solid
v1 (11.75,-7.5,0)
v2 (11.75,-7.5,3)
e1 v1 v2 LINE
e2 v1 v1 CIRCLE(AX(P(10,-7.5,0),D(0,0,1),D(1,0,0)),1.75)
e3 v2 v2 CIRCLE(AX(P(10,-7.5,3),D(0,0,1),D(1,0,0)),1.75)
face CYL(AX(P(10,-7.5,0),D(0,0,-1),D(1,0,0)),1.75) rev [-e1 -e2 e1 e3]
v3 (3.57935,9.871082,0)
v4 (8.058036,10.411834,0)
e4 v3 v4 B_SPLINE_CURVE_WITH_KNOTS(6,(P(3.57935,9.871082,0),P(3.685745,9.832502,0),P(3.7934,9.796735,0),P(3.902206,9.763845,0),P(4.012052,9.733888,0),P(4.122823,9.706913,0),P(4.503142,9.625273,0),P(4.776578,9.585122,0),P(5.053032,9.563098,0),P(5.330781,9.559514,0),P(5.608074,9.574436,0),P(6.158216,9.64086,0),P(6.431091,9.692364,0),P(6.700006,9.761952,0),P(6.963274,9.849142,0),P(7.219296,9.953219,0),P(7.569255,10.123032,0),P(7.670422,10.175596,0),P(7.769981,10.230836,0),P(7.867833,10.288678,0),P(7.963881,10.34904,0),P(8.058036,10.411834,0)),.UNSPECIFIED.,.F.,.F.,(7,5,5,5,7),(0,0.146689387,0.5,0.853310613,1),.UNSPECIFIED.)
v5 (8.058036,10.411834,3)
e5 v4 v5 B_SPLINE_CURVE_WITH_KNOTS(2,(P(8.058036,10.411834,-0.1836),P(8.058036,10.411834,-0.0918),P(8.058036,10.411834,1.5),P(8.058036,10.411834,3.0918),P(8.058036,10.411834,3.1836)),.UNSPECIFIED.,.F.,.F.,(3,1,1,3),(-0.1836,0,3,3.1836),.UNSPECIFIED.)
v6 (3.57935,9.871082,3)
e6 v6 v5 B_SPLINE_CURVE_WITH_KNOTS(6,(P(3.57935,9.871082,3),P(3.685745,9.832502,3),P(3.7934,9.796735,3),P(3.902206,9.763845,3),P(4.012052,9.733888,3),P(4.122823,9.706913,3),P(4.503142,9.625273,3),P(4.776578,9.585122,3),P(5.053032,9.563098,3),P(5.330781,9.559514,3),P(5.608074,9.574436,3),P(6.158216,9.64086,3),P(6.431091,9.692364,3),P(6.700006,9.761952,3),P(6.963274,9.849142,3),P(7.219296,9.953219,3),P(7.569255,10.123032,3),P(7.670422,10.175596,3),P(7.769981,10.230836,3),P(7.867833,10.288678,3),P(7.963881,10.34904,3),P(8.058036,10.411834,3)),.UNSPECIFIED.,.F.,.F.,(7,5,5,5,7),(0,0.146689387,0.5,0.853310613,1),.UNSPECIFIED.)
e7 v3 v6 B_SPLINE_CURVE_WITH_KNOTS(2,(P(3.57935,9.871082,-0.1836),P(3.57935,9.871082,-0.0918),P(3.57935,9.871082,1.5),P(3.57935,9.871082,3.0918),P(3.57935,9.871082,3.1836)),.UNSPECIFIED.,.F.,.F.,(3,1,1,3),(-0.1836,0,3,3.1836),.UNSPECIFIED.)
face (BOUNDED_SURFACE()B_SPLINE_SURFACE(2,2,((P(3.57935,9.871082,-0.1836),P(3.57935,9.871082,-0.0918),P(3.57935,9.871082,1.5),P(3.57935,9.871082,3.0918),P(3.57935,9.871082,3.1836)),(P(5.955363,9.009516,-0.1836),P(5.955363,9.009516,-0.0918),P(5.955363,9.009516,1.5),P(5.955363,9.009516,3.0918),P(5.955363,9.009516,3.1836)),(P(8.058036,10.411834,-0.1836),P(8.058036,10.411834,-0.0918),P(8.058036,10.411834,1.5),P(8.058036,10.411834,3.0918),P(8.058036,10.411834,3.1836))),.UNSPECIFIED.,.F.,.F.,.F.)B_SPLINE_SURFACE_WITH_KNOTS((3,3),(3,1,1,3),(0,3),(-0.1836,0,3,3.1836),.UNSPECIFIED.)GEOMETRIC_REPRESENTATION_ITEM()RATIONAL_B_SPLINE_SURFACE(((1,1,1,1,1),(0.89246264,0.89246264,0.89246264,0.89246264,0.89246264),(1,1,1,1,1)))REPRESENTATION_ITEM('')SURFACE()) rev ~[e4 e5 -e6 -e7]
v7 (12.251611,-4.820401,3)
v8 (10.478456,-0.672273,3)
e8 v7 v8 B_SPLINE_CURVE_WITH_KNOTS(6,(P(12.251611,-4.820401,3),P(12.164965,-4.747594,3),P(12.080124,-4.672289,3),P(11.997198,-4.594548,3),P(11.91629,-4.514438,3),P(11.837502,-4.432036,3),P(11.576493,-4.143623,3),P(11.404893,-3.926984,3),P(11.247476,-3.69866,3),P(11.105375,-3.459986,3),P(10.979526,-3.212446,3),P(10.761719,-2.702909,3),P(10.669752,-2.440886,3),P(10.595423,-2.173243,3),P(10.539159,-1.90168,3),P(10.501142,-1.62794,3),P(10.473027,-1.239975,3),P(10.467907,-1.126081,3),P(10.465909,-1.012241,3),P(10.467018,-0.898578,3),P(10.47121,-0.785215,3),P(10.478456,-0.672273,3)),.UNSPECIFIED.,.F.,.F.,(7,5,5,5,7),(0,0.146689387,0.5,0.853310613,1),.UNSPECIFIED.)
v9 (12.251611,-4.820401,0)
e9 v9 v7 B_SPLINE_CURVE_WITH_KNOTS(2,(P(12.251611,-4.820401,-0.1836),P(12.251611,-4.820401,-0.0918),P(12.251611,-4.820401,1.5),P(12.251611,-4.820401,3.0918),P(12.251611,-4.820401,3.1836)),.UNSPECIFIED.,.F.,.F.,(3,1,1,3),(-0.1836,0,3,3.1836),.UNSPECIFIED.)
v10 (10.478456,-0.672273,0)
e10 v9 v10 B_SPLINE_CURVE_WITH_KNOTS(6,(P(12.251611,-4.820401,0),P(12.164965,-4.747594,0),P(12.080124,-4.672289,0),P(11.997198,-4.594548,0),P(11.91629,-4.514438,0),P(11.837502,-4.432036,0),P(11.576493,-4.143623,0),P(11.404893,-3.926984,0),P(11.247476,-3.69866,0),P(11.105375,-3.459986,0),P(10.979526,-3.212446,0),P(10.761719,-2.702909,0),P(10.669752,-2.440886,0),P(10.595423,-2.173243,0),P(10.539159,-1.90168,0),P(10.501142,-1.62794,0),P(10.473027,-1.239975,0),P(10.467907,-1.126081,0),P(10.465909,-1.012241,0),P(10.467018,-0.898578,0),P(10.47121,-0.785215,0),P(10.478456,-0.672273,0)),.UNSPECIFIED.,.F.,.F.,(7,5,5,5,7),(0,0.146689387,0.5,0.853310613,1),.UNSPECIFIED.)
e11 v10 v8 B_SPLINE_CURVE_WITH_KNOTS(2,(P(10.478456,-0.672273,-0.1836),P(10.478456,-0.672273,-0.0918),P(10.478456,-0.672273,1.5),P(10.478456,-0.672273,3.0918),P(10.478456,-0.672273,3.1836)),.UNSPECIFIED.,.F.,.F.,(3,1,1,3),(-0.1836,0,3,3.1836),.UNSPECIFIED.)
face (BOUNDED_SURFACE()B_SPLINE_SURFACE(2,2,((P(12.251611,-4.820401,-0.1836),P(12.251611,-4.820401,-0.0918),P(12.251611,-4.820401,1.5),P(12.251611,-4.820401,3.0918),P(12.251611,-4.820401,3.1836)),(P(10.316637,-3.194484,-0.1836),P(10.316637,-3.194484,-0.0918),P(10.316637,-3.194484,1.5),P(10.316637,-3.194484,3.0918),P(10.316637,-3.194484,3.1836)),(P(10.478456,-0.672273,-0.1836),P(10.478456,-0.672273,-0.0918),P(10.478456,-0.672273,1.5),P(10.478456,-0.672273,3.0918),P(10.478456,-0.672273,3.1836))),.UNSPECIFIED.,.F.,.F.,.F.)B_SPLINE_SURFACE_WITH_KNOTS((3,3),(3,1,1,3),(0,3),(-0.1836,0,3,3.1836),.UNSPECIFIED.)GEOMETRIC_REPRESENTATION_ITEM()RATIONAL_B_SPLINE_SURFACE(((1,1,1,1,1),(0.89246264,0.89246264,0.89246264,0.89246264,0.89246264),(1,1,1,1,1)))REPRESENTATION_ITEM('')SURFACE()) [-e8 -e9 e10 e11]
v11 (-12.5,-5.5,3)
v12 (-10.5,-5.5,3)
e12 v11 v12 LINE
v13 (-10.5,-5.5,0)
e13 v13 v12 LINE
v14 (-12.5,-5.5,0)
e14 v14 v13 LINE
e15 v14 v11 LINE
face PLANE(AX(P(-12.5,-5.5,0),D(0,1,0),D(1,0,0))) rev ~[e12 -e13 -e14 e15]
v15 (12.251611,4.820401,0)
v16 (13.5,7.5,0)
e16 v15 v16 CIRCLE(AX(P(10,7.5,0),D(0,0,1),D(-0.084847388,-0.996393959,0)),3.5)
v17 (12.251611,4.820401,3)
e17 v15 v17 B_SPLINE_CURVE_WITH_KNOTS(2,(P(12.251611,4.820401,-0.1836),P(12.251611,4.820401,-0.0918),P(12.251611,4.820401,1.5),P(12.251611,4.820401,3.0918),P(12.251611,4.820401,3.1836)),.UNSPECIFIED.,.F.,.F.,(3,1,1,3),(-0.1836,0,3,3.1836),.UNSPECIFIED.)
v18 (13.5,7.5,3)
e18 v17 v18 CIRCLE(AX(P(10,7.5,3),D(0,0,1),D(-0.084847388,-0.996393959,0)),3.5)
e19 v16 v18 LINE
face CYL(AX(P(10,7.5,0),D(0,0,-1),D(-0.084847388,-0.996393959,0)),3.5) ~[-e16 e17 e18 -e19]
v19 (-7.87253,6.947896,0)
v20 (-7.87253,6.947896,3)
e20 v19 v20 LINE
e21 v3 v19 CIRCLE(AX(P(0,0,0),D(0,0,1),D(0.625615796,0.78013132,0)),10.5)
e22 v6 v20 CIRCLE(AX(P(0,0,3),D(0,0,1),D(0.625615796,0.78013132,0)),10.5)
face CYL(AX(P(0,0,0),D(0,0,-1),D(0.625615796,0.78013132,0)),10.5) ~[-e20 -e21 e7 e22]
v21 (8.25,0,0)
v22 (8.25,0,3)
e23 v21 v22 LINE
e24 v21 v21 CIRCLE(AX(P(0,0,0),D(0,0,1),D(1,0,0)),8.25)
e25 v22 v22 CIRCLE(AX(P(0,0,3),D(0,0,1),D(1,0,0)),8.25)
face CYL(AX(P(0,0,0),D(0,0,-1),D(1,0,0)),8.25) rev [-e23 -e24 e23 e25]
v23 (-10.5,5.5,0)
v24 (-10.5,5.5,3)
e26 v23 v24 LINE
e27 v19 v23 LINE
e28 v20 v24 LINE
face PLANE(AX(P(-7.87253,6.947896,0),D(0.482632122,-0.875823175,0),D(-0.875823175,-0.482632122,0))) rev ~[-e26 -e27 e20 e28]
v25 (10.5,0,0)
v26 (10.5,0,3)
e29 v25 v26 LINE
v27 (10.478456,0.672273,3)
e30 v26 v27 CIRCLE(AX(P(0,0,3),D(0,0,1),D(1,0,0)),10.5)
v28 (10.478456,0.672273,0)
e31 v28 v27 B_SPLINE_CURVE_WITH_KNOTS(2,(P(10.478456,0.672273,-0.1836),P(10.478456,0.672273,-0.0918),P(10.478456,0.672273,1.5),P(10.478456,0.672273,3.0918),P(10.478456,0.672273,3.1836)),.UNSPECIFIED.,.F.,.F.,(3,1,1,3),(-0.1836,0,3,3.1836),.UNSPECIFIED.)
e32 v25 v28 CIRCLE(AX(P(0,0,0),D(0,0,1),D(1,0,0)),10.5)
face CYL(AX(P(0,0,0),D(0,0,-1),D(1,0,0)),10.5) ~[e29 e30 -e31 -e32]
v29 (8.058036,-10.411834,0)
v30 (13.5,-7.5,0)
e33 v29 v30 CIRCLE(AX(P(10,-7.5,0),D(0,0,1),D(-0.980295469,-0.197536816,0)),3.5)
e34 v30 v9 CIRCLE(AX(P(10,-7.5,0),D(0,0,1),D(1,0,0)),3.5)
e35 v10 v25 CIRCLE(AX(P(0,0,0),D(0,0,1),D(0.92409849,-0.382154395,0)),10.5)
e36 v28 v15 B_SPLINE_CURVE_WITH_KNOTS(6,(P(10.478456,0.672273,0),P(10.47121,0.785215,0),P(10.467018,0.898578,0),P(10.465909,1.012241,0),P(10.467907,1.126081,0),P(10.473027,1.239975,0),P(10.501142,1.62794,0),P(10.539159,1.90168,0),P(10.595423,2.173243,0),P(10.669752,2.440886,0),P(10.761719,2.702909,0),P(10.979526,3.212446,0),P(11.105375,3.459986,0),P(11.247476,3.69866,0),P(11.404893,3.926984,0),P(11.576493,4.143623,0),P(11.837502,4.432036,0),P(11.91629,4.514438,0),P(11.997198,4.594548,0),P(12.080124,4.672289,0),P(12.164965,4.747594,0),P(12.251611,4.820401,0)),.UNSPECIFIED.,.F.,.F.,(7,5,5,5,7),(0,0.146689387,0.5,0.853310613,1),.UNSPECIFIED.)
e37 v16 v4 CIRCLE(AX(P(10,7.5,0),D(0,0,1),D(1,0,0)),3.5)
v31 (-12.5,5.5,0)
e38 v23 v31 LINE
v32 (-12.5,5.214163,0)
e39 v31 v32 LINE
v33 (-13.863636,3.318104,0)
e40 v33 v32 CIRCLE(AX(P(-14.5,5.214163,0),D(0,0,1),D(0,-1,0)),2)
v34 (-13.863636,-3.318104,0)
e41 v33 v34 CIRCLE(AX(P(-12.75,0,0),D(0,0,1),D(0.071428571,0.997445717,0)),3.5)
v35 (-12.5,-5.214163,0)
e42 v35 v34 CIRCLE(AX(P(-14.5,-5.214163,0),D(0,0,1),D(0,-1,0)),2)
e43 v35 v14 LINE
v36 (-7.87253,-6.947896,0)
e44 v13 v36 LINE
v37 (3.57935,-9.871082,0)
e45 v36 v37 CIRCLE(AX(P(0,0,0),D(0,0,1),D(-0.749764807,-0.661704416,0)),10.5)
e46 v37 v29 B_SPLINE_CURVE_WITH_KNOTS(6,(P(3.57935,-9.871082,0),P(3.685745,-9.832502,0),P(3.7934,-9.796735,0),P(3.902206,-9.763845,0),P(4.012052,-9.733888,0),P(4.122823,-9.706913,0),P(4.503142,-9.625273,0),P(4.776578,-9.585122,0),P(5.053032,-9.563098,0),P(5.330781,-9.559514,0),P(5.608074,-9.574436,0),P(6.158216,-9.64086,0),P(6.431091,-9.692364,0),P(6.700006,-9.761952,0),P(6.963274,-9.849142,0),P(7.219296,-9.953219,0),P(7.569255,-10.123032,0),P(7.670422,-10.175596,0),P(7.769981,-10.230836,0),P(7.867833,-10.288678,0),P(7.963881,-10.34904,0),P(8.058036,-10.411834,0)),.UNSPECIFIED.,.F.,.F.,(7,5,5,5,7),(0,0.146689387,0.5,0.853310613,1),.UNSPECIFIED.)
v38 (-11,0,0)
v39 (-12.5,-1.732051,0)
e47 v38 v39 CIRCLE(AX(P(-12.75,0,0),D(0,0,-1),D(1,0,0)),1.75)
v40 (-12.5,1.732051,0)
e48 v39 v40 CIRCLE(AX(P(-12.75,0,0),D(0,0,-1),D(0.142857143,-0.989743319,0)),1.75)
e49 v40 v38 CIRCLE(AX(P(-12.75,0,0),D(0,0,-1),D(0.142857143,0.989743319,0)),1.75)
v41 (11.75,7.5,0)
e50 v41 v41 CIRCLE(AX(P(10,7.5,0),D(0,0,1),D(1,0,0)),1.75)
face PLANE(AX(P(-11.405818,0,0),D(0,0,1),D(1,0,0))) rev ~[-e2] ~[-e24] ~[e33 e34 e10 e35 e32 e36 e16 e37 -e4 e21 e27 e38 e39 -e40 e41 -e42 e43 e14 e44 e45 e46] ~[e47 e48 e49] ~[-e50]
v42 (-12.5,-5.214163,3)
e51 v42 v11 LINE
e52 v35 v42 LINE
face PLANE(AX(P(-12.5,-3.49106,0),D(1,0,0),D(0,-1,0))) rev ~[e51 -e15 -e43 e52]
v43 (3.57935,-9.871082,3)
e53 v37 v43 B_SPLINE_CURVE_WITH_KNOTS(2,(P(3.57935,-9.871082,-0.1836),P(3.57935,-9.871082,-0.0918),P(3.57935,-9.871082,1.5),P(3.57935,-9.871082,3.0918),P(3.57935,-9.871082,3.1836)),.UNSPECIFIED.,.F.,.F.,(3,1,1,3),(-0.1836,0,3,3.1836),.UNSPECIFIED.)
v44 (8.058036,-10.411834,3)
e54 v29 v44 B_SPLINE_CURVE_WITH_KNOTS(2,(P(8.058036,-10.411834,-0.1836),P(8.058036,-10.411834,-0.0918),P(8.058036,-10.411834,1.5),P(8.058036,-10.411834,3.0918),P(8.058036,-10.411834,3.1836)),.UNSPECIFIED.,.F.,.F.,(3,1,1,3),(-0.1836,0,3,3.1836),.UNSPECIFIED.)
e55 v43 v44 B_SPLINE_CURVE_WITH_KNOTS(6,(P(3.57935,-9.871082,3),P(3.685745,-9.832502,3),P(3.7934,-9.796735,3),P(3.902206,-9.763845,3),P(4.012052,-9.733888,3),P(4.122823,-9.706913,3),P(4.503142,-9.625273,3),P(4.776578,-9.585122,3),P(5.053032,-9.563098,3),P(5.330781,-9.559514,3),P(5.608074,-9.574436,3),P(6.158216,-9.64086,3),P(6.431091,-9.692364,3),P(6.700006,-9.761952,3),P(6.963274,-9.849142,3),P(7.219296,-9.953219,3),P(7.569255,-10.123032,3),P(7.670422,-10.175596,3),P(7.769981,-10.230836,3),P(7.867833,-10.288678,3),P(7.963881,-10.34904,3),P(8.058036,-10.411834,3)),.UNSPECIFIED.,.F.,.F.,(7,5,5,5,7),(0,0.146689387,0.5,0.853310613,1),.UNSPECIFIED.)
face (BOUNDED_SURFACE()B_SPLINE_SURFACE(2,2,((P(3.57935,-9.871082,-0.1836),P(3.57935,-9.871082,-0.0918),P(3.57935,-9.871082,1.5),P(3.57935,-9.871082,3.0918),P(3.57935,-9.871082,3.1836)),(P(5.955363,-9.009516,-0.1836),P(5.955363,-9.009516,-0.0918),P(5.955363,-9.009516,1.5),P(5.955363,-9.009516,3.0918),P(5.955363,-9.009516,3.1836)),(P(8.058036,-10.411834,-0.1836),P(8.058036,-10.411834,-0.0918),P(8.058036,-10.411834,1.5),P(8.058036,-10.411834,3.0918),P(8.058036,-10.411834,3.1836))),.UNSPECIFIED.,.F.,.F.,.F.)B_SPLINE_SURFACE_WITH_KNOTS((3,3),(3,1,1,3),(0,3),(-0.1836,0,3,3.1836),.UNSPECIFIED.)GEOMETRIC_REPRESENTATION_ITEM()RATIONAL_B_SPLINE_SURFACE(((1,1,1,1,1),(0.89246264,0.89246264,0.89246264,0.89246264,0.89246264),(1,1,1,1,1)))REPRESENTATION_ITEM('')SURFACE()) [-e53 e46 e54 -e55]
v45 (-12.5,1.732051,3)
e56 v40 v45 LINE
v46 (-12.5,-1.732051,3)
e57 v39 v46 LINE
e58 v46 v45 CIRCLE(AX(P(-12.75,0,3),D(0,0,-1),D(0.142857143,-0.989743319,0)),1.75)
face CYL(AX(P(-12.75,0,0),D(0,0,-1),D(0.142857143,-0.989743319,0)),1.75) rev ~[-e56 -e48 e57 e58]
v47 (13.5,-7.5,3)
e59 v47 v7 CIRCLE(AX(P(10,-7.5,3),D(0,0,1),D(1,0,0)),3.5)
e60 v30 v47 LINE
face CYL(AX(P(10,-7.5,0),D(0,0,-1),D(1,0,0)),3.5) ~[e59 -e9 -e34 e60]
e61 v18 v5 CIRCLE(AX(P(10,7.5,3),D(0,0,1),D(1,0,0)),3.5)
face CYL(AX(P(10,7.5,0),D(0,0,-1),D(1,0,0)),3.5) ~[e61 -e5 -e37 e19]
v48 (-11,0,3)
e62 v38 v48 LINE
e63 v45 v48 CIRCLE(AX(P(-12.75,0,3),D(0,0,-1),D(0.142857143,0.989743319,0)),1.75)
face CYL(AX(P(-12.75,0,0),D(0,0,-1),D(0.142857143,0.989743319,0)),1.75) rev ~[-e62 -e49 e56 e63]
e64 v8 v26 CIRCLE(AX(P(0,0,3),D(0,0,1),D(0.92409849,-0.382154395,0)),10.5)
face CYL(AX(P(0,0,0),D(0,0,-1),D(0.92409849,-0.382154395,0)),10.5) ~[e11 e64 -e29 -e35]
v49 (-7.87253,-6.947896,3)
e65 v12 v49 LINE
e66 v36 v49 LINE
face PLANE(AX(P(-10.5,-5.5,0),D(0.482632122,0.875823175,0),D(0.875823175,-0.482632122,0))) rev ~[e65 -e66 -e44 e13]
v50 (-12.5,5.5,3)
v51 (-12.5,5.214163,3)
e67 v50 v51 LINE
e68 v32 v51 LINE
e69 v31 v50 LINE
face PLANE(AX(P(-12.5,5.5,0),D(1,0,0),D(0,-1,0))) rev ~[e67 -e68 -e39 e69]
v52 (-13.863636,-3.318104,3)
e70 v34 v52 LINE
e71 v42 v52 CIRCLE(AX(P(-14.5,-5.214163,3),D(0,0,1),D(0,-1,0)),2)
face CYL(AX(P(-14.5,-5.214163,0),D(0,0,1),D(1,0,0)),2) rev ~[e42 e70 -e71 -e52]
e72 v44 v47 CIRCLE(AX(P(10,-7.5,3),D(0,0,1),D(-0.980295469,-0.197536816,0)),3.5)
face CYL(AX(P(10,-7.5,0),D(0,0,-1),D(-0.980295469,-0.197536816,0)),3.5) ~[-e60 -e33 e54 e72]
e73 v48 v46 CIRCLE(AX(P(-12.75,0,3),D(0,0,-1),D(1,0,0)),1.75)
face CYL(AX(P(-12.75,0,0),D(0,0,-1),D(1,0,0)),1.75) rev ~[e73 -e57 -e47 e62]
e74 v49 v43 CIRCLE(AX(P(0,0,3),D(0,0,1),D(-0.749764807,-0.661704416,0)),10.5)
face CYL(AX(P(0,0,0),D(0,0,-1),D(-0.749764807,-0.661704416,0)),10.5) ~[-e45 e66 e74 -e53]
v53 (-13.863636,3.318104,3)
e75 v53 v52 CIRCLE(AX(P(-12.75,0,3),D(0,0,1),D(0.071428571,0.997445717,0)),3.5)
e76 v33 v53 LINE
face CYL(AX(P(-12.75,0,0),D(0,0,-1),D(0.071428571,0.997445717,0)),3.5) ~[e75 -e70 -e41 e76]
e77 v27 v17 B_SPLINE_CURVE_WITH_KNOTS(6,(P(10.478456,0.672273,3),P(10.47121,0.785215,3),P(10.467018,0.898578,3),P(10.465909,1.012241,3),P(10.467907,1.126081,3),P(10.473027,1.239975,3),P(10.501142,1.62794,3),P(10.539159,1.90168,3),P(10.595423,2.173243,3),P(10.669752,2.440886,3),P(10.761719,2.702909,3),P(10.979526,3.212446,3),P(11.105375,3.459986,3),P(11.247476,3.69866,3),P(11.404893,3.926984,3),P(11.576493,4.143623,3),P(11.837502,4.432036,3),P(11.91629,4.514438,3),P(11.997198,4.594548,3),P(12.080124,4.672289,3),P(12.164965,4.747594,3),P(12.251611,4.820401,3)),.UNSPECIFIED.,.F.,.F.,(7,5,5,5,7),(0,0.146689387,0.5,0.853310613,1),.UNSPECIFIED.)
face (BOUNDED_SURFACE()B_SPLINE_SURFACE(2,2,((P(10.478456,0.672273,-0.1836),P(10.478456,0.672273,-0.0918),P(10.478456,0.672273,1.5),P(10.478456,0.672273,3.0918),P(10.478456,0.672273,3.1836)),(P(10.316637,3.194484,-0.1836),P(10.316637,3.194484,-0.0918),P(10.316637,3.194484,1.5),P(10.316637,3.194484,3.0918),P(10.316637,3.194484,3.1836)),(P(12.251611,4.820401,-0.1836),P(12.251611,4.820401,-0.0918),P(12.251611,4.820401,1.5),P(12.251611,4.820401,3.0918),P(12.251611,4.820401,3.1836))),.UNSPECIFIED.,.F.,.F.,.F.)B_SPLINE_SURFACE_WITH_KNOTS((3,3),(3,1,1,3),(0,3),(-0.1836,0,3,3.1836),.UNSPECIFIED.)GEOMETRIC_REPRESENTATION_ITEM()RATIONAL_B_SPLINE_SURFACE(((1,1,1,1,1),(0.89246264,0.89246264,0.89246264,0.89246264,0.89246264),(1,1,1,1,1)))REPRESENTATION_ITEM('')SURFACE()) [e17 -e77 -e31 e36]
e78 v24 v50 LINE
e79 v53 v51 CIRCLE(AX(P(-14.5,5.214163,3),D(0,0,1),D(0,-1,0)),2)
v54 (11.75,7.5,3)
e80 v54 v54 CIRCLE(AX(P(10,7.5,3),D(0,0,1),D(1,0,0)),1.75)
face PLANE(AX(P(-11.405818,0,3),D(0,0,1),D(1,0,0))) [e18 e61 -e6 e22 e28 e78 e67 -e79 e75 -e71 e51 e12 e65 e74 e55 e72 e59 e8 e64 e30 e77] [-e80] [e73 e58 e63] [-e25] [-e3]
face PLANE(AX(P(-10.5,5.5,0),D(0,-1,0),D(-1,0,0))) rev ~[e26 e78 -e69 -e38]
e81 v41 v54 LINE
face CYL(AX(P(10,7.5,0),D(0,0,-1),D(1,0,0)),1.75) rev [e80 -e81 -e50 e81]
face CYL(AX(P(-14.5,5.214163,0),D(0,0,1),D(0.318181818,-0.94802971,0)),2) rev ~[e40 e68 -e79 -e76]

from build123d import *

# Parameters (mm, degrees)
F0_R     = 8.25
F0_R_2   = 1.75
F1_DEPTH = 3
F2_R     = 2
F3_R     = 5


# Not quite as in the source:
# - a feature names something its author has since deleted; it is built from what else it names


with BuildPart() as f1:
    # F0 (on Top) → F1 (new body)
    with BuildSketch(Plane.XY):
        with BuildLine():
            Line((-10.5, -2.6809513237), (-10.5, 0))
            Line((-10.5, 0), (-10.5, 2.6809513237))
            ThreePointArc((-10.5, 2.6809513237), (-11.4360102659, 3.243983813), (-12.5, 3.4910600109))
            Line((-12.5, 3.4910600109), (-12.5, 1.7320508076))
            ThreePointArc((-12.5, 1.7320508076), (-11.4271243445, 1.1456439237), (-11, 0))
            ThreePointArc((-11, 0), (-11.4271243445, -1.1456439237), (-12.5, -1.7320508076))
            Line((-12.5, -1.7320508076), (-12.5, -3.4910600109))
            ThreePointArc((-12.5, -3.4910600109), (-11.4360102659, -3.243983813), (-10.5, -2.6809513237))
        make_face()
        with BuildLine():
            Line((-12.5, 1.7320508076), (-12.5, 3.4910600109))
            ThreePointArc((-12.5, 3.4910600109), (-16.25, 0), (-12.5, -3.4910600109))
            Line((-12.5, -3.4910600109), (-12.5, -1.7320508076))
            ThreePointArc((-12.5, -1.7320508076), (-14.5, 0), (-12.5, 1.7320508076))
        make_face()
        with BuildLine():
            Line((-10.5, 2.6809513237), (-10.5, 5.5))
            Line((-10.5, 5.5), (-12.5, 5.5))
            Line((-12.5, 5.5), (-12.5, 3.4910600109))
            ThreePointArc((-12.5, 3.4910600109), (-11.4360102659, 3.243983813), (-10.5, 2.6809513237))
        make_face()
        with BuildLine():
            ThreePointArc((-10.2181372549, 2.4165411314), (-9.3247712996, 4.8268665001), (-7.8725304742, 6.9478963675))
            Line((-7.8725304742, 6.9478963675), (-10.5, 5.5))
            Line((-10.5, 5.5), (-10.5, 2.6809513237))
            ThreePointArc((-10.5, 2.6809513237), (-10.3554163168, 2.5526396111), (-10.2181372549, 2.4165411314))
        make_face()
        with BuildLine():
            Line((-7.2260237528, 5.7746931281), (-7.8725304742, 6.9478963675))
            ThreePointArc((-7.8725304742, 6.9478963675), (-9.3247712996, 4.8268665001), (-10.2181372549, 2.4165411314))
            ThreePointArc((-10.2181372549, 2.4165411314), (-9.5010371187, 1.301629823), (-9.25, 0))
            ThreePointArc((-9.25, 0), (-8.729353347, 3.0595571809), (-7.2260237528, 5.7746931281))
        make_face()
        with BuildLine():
            ThreePointArc((6.6767394005, 6.401847466), (6.5063300085, 7.2895956499), (6.5689658587, 8.1913788551))
            ThreePointArc((6.5689658587, 8.1913788551), (-0.9007676454, 10.4612913949), (-7.8725304742, 6.9478963675))
            Line((-7.8725304742, 6.9478963675), (-7.2260237528, 5.7746931281))
            ThreePointArc((-7.2260237528, 5.7746931281), (-0.4168440545, 9.2406028502), (6.6767394005, 6.401847466))
        make_face()
        with BuildLine():
            ThreePointArc((9.25, 0), (8.9359851316, 2.3897007611), (8.0152605995, 4.617152534))
            ThreePointArc((8.0152605995, 4.617152534), (7.2, 5.4), (6.6767394005, 6.401847466))
            ThreePointArc((6.6767394005, 6.401847466), (-0.4168440545, 9.2406028502), (-7.2260237528, 5.7746931281))
            ThreePointArc((-7.2260237528, 5.7746931281), (-8.729353347, 3.0595571809), (-9.25, 0))
            ThreePointArc((-9.25, 0), (-8.729353347, -3.0595571809), (-7.2260237528, -5.7746931281))
            ThreePointArc((-7.2260237528, -5.7746931281), (-0.4168440545, -9.2406028502), (6.6767394005, -6.401847466))
            ThreePointArc((6.6767394005, -6.401847466), (7.2, -5.4), (8.0152605995, -4.617152534))
            ThreePointArc((8.0152605995, -4.617152534), (8.9359851316, -2.3897007611), (9.25, 0))
        make_face()
        Circle(F0_R, mode=Mode.SUBTRACT)
        with BuildLine():
            Line((-12.5, -5.5), (-10.5, -5.5))
            Line((-10.5, -5.5), (-10.5, -2.6809513237))
            ThreePointArc((-10.5, -2.6809513237), (-11.4360102659, -3.243983813), (-12.5, -3.4910600109))
            Line((-12.5, -3.4910600109), (-12.5, -5.5))
        make_face()
        with BuildLine():
            Line((-10.5, -5.5), (-7.8725304742, -6.9478963675))
            ThreePointArc((-7.8725304742, -6.9478963675), (-9.3247712996, -4.8268665001), (-10.2181372549, -2.4165411314))
            ThreePointArc((-10.2181372549, -2.4165411314), (-10.3554163168, -2.5526396111), (-10.5, -2.6809513237))
            Line((-10.5, -2.6809513237), (-10.5, -5.5))
        make_face()
        with BuildLine():
            ThreePointArc((-10.5, -2.6809513237), (-10.3554163168, -2.5526396111), (-10.2181372549, -2.4165411314))
            ThreePointArc((-10.2181372549, -2.4165411314), (-10.4292962652, -1.2164618415), (-10.5, 0))
            Line((-10.5, 0), (-10.5, -2.6809513237))
        make_face()
        with BuildLine():
            ThreePointArc((-9.25, 0), (-9.5010371187, 1.301629823), (-10.2181372549, 2.4165411314))
            ThreePointArc((-10.2181372549, 2.4165411314), (-10.4292962652, 1.2164618415), (-10.5, 0))
            ThreePointArc((-10.5, 0), (-10.4292962652, -1.2164618415), (-10.2181372549, -2.4165411314))
            ThreePointArc((-10.2181372549, -2.4165411314), (-9.5010371187, -1.301629823), (-9.25, 0))
        make_face()
        with BuildLine():
            ThreePointArc((-10.2181372549, -2.4165411314), (-9.3247712996, -4.8268665001), (-7.8725304742, -6.9478963675))
            Line((-7.8725304742, -6.9478963675), (-7.2260237528, -5.7746931281))
            ThreePointArc((-7.2260237528, -5.7746931281), (-8.729353347, -3.0595571809), (-9.25, 0))
            ThreePointArc((-9.25, 0), (-9.5010371187, -1.301629823), (-10.2181372549, -2.4165411314))
        make_face()
        with BuildLine():
            ThreePointArc((-10.5, 0), (-10.4292962652, 1.2164618415), (-10.2181372549, 2.4165411314))
            ThreePointArc((-10.2181372549, 2.4165411314), (-10.3554163168, 2.5526396111), (-10.5, 2.6809513237))
            Line((-10.5, 2.6809513237), (-10.5, 0))
        make_face()
        with BuildLine():
            ThreePointArc((-7.8725304742, -6.9478963675), (-0.9007676454, -10.4612913949), (6.5689658587, -8.1913788551))
            ThreePointArc((6.5689658587, -8.1913788551), (6.5063300085, -7.2895956499), (6.6767394005, -6.401847466))
            ThreePointArc((6.6767394005, -6.401847466), (-0.4168440545, -9.2406028502), (-7.2260237528, -5.7746931281))
            Line((-7.2260237528, -5.7746931281), (-7.8725304742, -6.9478963675))
        make_face()
        with BuildLine():
            ThreePointArc((6.5689658587, -8.1913788551), (8.4, -6.3), (9.7030341413, -4.0126211449))
            ThreePointArc((9.7030341413, -4.0126211449), (8.8197842263, -4.2049900262), (8.0152605995, -4.617152534))
            ThreePointArc((8.0152605995, -4.617152534), (7.4, -5.55), (6.6767394005, -6.401847466))
            ThreePointArc((6.6767394005, -6.401847466), (6.5063300085, -7.2895956499), (6.5689658587, -8.1913788551))
        make_face()
        with BuildLine():
            ThreePointArc((13.5, -7.5), (12.3675535363, -4.9222703298), (9.7030341413, -4.0126211449))
            ThreePointArc((9.7030341413, -4.0126211449), (8.4, -6.3), (6.5689658587, -8.1913788551))
            ThreePointArc((6.5689658587, -8.1913788551), (10.3474050269, -10.982715858), (13.5, -7.5))
        make_face()
        with Locations((10, -7.5)):
            Circle(F0_R_2, mode=Mode.SUBTRACT)
        with BuildLine():
            ThreePointArc((6.6767394005, -6.401847466), (7.4, -5.55), (8.0152605995, -4.617152534))
            ThreePointArc((8.0152605995, -4.617152534), (7.2, -5.4), (6.6767394005, -6.401847466))
        make_face()
        with BuildLine():
            ThreePointArc((9.7030341413, -4.0126211449), (10.2988314503, -2.0455001242), (10.5, 0))
            ThreePointArc((10.5, 0), (10.2988314503, 2.0455001242), (9.7030341413, 4.0126211449))
            ThreePointArc((9.7030341413, 4.0126211449), (8.8197842263, 4.2049900262), (8.0152605995, 4.617152534))
            ThreePointArc((8.0152605995, 4.617152534), (8.9359851316, 2.3897007611), (9.25, 0))
            ThreePointArc((9.25, 0), (8.9359851316, -2.3897007611), (8.0152605995, -4.617152534))
            ThreePointArc((8.0152605995, -4.617152534), (8.8197842263, -4.2049900262), (9.7030341413, -4.0126211449))
        make_face()
        with BuildLine():
            ThreePointArc((6.6767394005, 6.401847466), (7.2, 5.4), (8.0152605995, 4.617152534))
            ThreePointArc((8.0152605995, 4.617152534), (7.4, 5.55), (6.6767394005, 6.401847466))
        make_face()
        with BuildLine():
            ThreePointArc((8.0152605995, 4.617152534), (8.8197842263, 4.2049900262), (9.7030341413, 4.0126211449))
            ThreePointArc((9.7030341413, 4.0126211449), (8.4, 6.3), (6.5689658587, 8.1913788551))
            ThreePointArc((6.5689658587, 8.1913788551), (6.5063300085, 7.2895956499), (6.6767394005, 6.401847466))
            ThreePointArc((6.6767394005, 6.401847466), (7.4, 5.55), (8.0152605995, 4.617152534))
        make_face()
        with BuildLine():
            ThreePointArc((6.5689658587, 8.1913788551), (8.4, 6.3), (9.7030341413, 4.0126211449))
            ThreePointArc((9.7030341413, 4.0126211449), (12.3675535363, 4.9222703298), (13.5, 7.5))
            ThreePointArc((13.5, 7.5), (10.3474050269, 10.982715858), (6.5689658587, 8.1913788551))
        make_face()
        with Locations((10, 7.5)):
            Circle(F0_R_2, mode=Mode.SUBTRACT)
    extrude(amount=F1_DEPTH)

    # F2
    f2_edges = [f1.edges().sort_by_distance(p)[0] for p in [
        (-12.5, -3.49106, 1.5),
        (-12.5, 3.49106, 1.5),
    ]]
    fillet(f2_edges, radius=F2_R)

    # F3
    f3_edges = [f1.edges().sort_by_distance(p)[0] for p in [
        (6.568966, -8.191379, 1.5),
        (9.703034, -4.012621, 1.5),
        (9.703034, 4.012621, 1.5),
        (6.568966, 8.191379, 1.5),
    ]]
    fillet(f3_edges, radius=F3_R)


solid = f1.part
